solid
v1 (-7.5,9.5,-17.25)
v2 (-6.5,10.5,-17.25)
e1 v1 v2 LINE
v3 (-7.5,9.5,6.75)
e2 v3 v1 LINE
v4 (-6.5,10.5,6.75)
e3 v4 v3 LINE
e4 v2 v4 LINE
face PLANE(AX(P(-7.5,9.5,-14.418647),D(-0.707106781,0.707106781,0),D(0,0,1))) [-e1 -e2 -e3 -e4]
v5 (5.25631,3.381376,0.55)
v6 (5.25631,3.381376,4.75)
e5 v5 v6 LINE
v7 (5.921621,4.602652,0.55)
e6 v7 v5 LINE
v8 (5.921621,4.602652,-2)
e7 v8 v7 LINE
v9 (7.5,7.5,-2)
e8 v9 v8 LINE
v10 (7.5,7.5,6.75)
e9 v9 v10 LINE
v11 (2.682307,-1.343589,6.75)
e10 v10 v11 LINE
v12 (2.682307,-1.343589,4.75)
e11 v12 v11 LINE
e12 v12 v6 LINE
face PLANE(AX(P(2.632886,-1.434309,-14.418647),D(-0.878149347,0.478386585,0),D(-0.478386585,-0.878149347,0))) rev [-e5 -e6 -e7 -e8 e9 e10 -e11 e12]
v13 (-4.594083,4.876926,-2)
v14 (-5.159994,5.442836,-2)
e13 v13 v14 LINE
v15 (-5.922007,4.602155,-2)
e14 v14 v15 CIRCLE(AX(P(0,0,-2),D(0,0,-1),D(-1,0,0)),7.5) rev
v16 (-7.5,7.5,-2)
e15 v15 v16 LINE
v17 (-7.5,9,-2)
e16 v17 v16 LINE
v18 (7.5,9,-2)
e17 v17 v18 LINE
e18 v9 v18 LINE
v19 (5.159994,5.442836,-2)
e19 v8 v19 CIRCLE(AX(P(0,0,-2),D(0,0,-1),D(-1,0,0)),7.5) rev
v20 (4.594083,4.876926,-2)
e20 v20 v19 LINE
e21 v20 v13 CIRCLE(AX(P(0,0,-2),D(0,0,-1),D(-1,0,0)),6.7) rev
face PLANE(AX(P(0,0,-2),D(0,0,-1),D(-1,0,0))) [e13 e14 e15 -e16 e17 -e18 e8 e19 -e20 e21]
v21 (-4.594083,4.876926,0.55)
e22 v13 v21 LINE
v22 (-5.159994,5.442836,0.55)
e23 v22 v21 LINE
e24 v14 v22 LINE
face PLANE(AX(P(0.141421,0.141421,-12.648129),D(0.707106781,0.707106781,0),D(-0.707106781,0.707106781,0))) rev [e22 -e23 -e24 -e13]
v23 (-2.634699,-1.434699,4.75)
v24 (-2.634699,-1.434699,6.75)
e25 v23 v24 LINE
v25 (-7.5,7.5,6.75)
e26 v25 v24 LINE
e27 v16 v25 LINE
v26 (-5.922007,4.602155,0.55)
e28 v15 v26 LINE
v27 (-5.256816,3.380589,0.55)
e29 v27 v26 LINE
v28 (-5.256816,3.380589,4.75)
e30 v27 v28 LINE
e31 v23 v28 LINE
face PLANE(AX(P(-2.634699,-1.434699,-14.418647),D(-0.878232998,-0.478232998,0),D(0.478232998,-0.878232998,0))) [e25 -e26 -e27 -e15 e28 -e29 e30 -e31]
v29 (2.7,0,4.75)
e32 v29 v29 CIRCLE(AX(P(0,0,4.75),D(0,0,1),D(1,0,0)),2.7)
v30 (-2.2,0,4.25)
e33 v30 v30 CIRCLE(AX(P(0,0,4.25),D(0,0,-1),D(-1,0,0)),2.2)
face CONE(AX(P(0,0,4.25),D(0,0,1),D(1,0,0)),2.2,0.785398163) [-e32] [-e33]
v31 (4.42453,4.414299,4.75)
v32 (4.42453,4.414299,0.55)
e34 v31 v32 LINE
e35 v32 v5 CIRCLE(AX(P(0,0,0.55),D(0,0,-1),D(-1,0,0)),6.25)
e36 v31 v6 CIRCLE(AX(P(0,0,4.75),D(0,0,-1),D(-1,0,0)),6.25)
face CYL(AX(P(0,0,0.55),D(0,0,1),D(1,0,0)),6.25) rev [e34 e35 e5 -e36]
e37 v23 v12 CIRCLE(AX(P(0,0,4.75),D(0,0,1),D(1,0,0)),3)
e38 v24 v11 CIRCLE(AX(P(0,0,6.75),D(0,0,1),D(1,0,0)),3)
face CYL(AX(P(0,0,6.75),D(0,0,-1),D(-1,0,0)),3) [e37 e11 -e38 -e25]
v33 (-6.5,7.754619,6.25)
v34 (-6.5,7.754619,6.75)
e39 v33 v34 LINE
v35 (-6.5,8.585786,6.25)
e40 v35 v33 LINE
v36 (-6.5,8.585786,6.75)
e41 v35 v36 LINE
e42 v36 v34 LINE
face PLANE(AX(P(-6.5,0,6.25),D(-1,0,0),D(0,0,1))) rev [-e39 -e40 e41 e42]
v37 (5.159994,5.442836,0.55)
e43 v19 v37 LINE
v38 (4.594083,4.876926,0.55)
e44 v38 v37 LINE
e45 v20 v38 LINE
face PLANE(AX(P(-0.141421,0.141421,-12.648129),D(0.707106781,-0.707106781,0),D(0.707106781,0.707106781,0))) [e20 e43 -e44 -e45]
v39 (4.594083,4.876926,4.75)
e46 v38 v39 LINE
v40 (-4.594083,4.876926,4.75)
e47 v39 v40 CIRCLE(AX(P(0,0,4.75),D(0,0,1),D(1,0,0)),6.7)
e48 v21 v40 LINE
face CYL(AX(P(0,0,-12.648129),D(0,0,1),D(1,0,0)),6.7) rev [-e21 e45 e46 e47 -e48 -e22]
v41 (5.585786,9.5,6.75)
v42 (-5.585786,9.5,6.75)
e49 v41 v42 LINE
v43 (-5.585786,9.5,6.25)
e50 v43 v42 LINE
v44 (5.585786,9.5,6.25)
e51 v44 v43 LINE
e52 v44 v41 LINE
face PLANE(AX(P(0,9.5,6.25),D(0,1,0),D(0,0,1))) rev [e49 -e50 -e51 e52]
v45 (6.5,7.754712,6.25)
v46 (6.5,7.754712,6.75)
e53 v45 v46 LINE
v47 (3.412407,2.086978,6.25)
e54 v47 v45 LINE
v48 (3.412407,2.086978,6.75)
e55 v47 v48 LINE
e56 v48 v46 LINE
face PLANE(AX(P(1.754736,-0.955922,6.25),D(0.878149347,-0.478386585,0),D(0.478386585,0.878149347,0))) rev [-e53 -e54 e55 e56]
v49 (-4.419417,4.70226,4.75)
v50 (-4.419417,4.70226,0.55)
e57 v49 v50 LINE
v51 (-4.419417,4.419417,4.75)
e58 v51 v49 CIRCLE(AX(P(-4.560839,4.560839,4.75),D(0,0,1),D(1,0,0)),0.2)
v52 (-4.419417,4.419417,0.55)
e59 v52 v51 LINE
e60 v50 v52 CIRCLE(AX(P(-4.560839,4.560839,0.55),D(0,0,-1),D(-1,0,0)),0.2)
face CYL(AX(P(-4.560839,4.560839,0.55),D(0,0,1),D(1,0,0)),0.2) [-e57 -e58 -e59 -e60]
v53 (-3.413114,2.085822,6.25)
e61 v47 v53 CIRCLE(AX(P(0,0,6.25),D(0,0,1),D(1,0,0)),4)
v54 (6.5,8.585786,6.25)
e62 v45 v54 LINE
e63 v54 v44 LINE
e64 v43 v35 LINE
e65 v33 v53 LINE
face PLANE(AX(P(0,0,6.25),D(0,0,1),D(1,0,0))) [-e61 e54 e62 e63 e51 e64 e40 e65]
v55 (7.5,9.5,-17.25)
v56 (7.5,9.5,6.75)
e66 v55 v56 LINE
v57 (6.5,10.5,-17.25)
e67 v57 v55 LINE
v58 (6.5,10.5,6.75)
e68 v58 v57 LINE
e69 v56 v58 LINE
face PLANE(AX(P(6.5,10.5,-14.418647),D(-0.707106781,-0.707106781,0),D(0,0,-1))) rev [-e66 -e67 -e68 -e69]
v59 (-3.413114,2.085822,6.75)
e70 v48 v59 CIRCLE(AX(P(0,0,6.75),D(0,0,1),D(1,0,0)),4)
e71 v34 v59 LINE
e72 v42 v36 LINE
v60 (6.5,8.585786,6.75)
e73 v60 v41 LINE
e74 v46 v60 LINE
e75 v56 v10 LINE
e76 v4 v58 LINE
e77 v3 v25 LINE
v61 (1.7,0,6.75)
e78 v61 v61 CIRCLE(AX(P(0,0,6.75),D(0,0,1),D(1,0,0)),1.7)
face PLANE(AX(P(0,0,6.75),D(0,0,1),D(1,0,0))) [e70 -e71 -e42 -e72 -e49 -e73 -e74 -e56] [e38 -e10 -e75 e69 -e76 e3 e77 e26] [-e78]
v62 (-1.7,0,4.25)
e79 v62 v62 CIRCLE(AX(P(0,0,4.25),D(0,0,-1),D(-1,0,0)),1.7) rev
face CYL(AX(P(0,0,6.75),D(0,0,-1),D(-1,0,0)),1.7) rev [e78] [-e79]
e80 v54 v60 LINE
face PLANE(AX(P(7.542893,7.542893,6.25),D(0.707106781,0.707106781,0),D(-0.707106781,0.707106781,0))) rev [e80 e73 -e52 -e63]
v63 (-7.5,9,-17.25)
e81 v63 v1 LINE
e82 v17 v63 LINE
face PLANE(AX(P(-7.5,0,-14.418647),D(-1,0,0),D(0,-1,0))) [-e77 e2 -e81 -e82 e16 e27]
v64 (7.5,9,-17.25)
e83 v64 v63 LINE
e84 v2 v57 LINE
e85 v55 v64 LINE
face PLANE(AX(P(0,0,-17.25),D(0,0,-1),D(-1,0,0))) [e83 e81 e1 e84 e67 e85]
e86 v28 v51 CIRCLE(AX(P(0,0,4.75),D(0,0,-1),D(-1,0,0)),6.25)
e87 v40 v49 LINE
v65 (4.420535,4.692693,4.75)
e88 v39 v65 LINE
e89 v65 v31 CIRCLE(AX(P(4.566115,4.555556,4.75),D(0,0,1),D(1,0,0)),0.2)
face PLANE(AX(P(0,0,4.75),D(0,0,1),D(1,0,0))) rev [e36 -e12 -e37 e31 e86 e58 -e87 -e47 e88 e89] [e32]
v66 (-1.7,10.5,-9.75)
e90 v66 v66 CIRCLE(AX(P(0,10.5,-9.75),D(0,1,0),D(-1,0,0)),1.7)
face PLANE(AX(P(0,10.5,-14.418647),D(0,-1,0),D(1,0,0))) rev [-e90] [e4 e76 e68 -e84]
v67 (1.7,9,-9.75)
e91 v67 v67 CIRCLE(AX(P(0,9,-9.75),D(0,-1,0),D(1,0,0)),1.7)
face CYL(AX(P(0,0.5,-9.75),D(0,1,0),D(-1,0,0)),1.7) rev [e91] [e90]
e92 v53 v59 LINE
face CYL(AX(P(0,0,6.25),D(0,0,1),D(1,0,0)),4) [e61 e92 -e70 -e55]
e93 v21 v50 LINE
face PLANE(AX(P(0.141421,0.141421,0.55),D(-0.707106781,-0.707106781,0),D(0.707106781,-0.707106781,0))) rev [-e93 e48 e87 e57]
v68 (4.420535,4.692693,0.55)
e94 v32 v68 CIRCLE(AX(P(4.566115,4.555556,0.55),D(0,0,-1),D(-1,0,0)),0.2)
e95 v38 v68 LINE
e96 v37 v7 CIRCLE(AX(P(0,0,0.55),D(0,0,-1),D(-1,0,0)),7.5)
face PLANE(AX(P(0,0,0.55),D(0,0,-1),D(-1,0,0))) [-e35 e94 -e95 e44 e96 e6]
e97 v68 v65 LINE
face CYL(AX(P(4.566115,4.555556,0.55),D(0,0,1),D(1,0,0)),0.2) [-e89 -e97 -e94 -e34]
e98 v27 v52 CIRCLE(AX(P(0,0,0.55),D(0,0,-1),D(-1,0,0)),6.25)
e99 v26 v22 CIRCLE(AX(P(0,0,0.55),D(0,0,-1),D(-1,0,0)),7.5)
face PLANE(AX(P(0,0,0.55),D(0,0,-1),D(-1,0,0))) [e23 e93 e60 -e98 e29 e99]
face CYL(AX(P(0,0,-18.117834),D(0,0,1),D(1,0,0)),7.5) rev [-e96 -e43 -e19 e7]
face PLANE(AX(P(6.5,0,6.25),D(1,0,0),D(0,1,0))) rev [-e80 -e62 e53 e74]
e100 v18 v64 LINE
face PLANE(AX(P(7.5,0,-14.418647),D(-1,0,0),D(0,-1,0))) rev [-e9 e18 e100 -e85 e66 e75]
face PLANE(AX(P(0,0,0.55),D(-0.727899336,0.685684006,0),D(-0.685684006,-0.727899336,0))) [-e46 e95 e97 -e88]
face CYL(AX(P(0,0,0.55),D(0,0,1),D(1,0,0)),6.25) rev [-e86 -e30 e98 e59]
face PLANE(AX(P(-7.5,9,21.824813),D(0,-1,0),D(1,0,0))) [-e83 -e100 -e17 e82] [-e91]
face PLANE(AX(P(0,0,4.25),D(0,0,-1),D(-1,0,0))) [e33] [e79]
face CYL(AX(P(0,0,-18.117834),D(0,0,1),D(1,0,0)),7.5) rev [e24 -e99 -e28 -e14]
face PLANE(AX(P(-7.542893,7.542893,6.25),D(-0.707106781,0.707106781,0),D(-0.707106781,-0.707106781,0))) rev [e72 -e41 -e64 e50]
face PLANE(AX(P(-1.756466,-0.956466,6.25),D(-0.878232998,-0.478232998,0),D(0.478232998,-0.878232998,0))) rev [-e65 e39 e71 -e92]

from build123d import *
from build123d.topology import SkipClean

# Parameters (mm, degrees)
BOSS_EXTRUDE1_DEPTH  = 2
BOSS_EXTRUDE2_START  = 4.75
BOSS_EXTRUDE2_DEPTH  = 4.75
BOSS_EXTRUDE3_START  = 2
SKETCH3_R            = 3
SKETCH3_R_2          = 1.7
BOSS_EXTRUDE3_DEPTH  = 2
SKETCH4_R            = 2.2
SKETCH4_R_2          = 1.7
BOSS_EXTRUDE4_DEPTH  = 0.5
CHAMFER1_SIZE        = 0.5
SKETCH5_W            = 7.5
SKETCH5_H            = 3
BOSS_EXTRUDE5_DEPTH  = 2
BOSS_EXTRUDE6_DEPTH  = 4.2
BOSS_EXTRUDE8_DEPTH  = 6.75
SKETCH10_W           = 15
SKETCH10_H           = 3
BOSS_EXTRUDE9_DEPTH  = 15.25
SKETCH11_R           = 1.65
CUT_EXTRUDE1_DEPTH   = 22.542109925
FILLET1_R            = 0.2
CHAMFER6_SIZE        = 1.5
BOSS_EXTRUDE12_REACH = 29.249
SKETCH16_W           = 15
SKETCH16_H           = 1.5
CUT_EXTRUDE3_DEPTH   = 0.5
CHAMFER7_SIZE        = 1
CUT_EXTRUDE4_DEPTH   = 15.25
SKETCH18_R           = 1.7
CUT_EXTRUDE5_DEPTH   = 10


with BuildPart() as part:
    # Sketch1 → Boss-Extrude1 (new body)
    with BuildSketch(Plane.XY):
        with BuildLine():
            Line((4.594082841, 4.876925553), (5.159993549, 5.442836262))
            ThreePointArc((5.159993549, 5.442836262), (0, 7.5), (-5.159993549, 5.442836262))
            Line((-5.159993549, 5.442836262), (-4.594082841, 4.876925553))
            ThreePointArc((-4.594082841, 4.876925553), (0, 6.7), (4.594082841, 4.876925553))
        make_face()
    extrude(amount=-BOSS_EXTRUDE1_DEPTH)

    # Sketch1<3> → Boss-Extrude2 (add)
    with BuildSketch(Plane.XY.offset(BOSS_EXTRUDE2_START)):
        with BuildLine():
            Line((4.594082841, 4.876925553), (5.159993549, 5.442836262))
            ThreePointArc((5.159993549, 5.442836262), (0, 7.5), (-5.159993549, 5.442836262))
            Line((-5.159993549, 5.442836262), (-4.594082841, 4.876925553))
            ThreePointArc((-4.594082841, 4.876925553), (0, 6.7), (4.594082841, 4.876925553))
        make_face()
    extrude(amount=-BOSS_EXTRUDE2_DEPTH)

    # Sketch3 → Boss-Extrude3 (add)
    # profile 1 of 4: a face of its own
    with BuildSketch(Plane.XY.offset(4.75).offset(BOSS_EXTRUDE3_START)):
        with BuildLine():
            Line((-4.594082841, 4.876925553), (-5.159993549, 5.442836262))
            Line((-5.159993549, 5.442836262), (-2.820975701, -1.02083108))
            ThreePointArc((-2.820975701, -1.02083108), (-2.892694114, 0.795185994), (-1.902774006, 2.31936437))
            Line((-1.902774006, 2.31936437), (-2.780654635, 4.745309242))
            ThreePointArc((-2.780654635, 4.745309242), (0, 5.5), (2.780654635, 4.745309242))
            Line((2.780654635, 4.745309242), (1.902774006, 2.31936437))
            ThreePointArc((1.902774006, 2.31936437), (2.711855639, 1.282902565), (3, 0))
            ThreePointArc((3, 0), (2.954904999, -0.518205025), (2.820975701, -1.02083108))
            Line((2.820975701, -1.02083108), (5.159993549, 5.442836262))
            Line((5.159993549, 5.442836262), (4.594082841, 4.876925553))
            ThreePointArc((4.594082841, 4.876925553), (0, 6.7), (-4.594082841, 4.876925553))
        make_face()
    # profile 2 of 4: a face of its own
    with BuildSketch(Plane.XY.offset(4.75).offset(BOSS_EXTRUDE3_START)):
        with BuildLine():
            Line((-5.159993549, 5.442836262), (-4.594082841, 4.876925553))
            ThreePointArc((-4.594082841, 4.876925553), (0, 6.7), (4.594082841, 4.876925553))
            Line((4.594082841, 4.876925553), (5.159993549, 5.442836262))
            ThreePointArc((5.159993549, 5.442836262), (0, 7.5), (-5.159993549, 5.442836262))
        make_face()
    # profile 3 of 4: a face of its own
    with BuildSketch(Plane.XY.offset(4.75).offset(BOSS_EXTRUDE3_START)):
        Circle(SKETCH3_R)
        Circle(SKETCH3_R_2, mode=Mode.SUBTRACT)
    # profile 4 of 4: a face of its own
    with BuildSketch(Plane.XY.offset(4.75).offset(BOSS_EXTRUDE3_START)):
        with BuildLine():
            Line((-2.780654635, 4.745309242), (-1.902774006, 2.31936437))
            ThreePointArc((-1.902774006, 2.31936437), (0, 3), (1.902774006, 2.31936437))
            Line((1.902774006, 2.31936437), (2.780654635, 4.745309242))
            ThreePointArc((2.780654635, 4.745309242), (0, 5.5), (-2.780654635, 4.745309242))
        make_face()
    extrude(amount=-BOSS_EXTRUDE3_DEPTH)

    # Sketch4 → Boss-Extrude4 (add)
    with SkipClean():  # the faces are left unmerged after this step: merging them gives an invalid solid
        with BuildSketch(Plane(origin=(0, 0, 4.75), x_dir=(-1, 0, 0), z_dir=(0, 0, -1))):
            with Locations(Location((0, 0, 0), (0, 0, 180))):
                Circle(SKETCH4_R)
            Circle(SKETCH4_R_2, mode=Mode.SUBTRACT)
        extrude(amount=BOSS_EXTRUDE4_DEPTH)
    add(part.part.scale(1), mode=Mode.REPLACE)  # the faces are merged on a copy

    # Chamfer1
    chamfer1_edges = [part.edges().sort_by_distance(p)[0] for p in [
        (-2.2, 0, 4.75),
    ]]
    chamfer(chamfer1_edges, length=CHAMFER1_SIZE - 0.0001)  # a hair under: the kernel refuses the full size

    # Sketch5 → Boss-Extrude5 (add)
    with BuildSketch(Plane.XY.offset(6.75)):
        with BuildLine():
            ThreePointArc((-5.159993549, 5.442836262), (-2.777474396, 6.966752183), (0, 7.5))
            Line((0, 7.5), (-7.5, 7.5))
            Line((-7.5, 7.5), (-2.634698995, -1.434698995))
            ThreePointArc((-2.634698995, -1.434698995), (-2.735675101, -1.231292711), (-2.820975701, -1.02083108))
            Line((-2.820975701, -1.02083108), (-5.159993549, 5.442836262))
        make_face()
        with Locations((-3.75, 9)):
            Rectangle(SKETCH5_W, SKETCH5_H)
        with Locations((3.75, 9)):
            Rectangle(SKETCH5_W, SKETCH5_H)
        with BuildLine():
            Line((7.5, 7.5), (0, 7.5))
            ThreePointArc((0, 7.5), (2.777474396, 6.966752183), (5.159993549, 5.442836262))
            Line((5.159993549, 5.442836262), (2.820975701, -1.02083108))
            ThreePointArc((2.820975701, -1.02083108), (2.756369418, -1.184241374), (2.682306676, -1.343588812))
            Line((2.682306676, -1.343588812), (7.5, 7.5))
        make_face()
    extrude(amount=-BOSS_EXTRUDE5_DEPTH)

    # Sketch6 → Boss-Extrude6 (add)
    with SkipClean():  # the faces are left unmerged after this step: merging them gives an invalid solid
        with BuildSketch(Plane(origin=(0, 0, 4.75), x_dir=(-1, 0, 0), z_dir=(0, 0, -1))):
            with BuildLine():
                Line((-5.921621025, 4.602651891), (-5.499242594, 3.827313795))
                ThreePointArc((-5.499242594, 3.827313795), (-5.073876801, 4.375588441), (-4.594082841, 4.876925553))
                Line((-4.594082841, 4.876925553), (-5.159993549, 5.442836262))
                ThreePointArc((-5.159993549, 5.442836262), (-5.556709713, 5.037159632), (-5.921621025, 4.602651891))
            make_face()
            with BuildLine():
                Line((5.159993549, 5.442836262), (4.594082841, 4.876925553))
                ThreePointArc((4.594082841, 4.876925553), (5.074143899, 4.375278699), (5.499709828, 3.826642367))
                Line((5.499709828, 3.826642367), (5.922007367, 4.602154794))
                ThreePointArc((5.922007367, 4.602154794), (5.556921127, 5.036926403), (5.159993549, 5.442836262))
            make_face()
            with BuildLine():
                Line((-5.499242594, 3.827313795), (-5.256310338, 3.381375701))
                ThreePointArc((-5.256310338, 3.381375701), (-4.806527723, 3.994970744), (-4.285525038, 4.549370852))
                Line((-4.285525038, 4.549370852), (-4.594082841, 4.876925553))
                ThreePointArc((-4.594082841, 4.876925553), (-5.073876801, 4.375588441), (-5.499242594, 3.827313795))
            make_face()
            with BuildLine():
                Line((4.594082841, 4.876925553), (4.275732705, 4.558575417))
                ThreePointArc((4.275732705, 4.558575417), (4.802528974, 3.999776925), (5.256816116, 3.380589346))
                Line((5.256816116, 3.380589346), (5.499709828, 3.826642367))
                ThreePointArc((5.499709828, 3.826642367), (5.074143899, 4.375278699), (4.594082841, 4.876925553))
            make_face()
        extrude(amount=BOSS_EXTRUDE6_DEPTH)

    # Sketch8 → Boss-Extrude8 (add)
    with BuildSketch(Plane(origin=(0, 0, 4.75), x_dir=(-1, 0, 0), z_dir=(0, 0, -1))):
        with BuildLine():
            Line((5.922007367, 4.602154794), (7.5, 7.5))
            Line((7.5, 7.5), (7.5, 10.5))
            Line((7.5, 10.5), (-7.5, 10.5))
            Line((-7.5, 10.5), (-7.5, 7.5))
            Line((-7.5, 7.5), (-5.921621025, 4.602651891))
            ThreePointArc((-5.921621025, 4.602651891), (0.000314788, 7.499999993), (5.922007367, 4.602154794))
        make_face()
    extrude(amount=BOSS_EXTRUDE8_DEPTH)

    # Sketch10 → Boss-Extrude9 (add)
    with BuildSketch(Plane(origin=(0, 0, -2), x_dir=(-1, 0, 0), z_dir=(0, 0, -1))):
        with Locations((0, 9)):
            Rectangle(SKETCH10_W, SKETCH10_H)
    extrude(amount=BOSS_EXTRUDE9_DEPTH)

    # Sketch11 → Cut-Extrude1 (cut, through all)
    with BuildSketch(Plane.XZ.offset(-7.5)):
        with Locations(Location((0, -9.5, 0), (0, 0, 270))):
            Circle(SKETCH11_R)
    extrude(amount=-CUT_EXTRUDE1_DEPTH, mode=Mode.SUBTRACT)

    # Fillet1
    fillet1_edges = [part.edges().sort_by_distance(p)[0] for p in [
        (4.285525038, 4.549370852, 2.65),
        (-4.275732705, 4.558575417, 2.65),
    ]]
    fillet(fillet1_edges, radius=FILLET1_R)

    # Chamfer6
    chamfer6_edges = [part.edges().sort_by_distance(p)[0] for p in [
        (7.5, 10.5, -5.25),
        (-7.5, 10.5, -5.25),
    ]]
    chamfer(chamfer6_edges, length=CHAMFER6_SIZE)

    # Boss-Extrude12: up to this face of the body (flat: up to its plane)
    boss_extrude12_end = Plane(part.part.faces().sort_by_distance((-0.00029363, 5.45528482, 6.75))[0])
    # Sketch16 → Boss-Extrude12 (add, up to the picked face)
    with BuildSketch(Plane(origin=(0, 0, -17.25), x_dir=(-1, 0, 0), z_dir=(0, 0, -1)), mode=Mode.PRIVATE) as boss_extrude12_sk1:
        with Locations((0, 9.75)):
            Rectangle(SKETCH16_W, SKETCH16_H)
    boss_extrude12_tool1 = split(extrude(boss_extrude12_sk1.sketch, amount=-BOSS_EXTRUDE12_REACH, mode=Mode.PRIVATE), bisect_by=boss_extrude12_end, keep=Keep.BOTH, mode=Mode.PRIVATE)
    add(boss_extrude12_tool1.solids().sort_by(Axis((0, 9.75, -17.25), (0, 0, 1)))[0])

    # Sketch13 → Cut-Extrude3 (cut)
    with BuildSketch(Plane.XY.offset(6.75)):
        with BuildLine():
            ThreePointArc((3.4124071, 2.086978147), (-0.000677338, 3.999999943), (-3.413113698, 2.085822351))
            Line((-3.413113698, 2.085822351), (-6.5, 7.754618569))
            Line((-6.5, 7.754618569), (-6.5, 8.585786438))
            Line((-6.5, 8.585786438), (-5.585786438, 9.5))
            Line((-5.585786438, 9.5), (5.585786438, 9.5))
            Line((5.585786438, 9.5), (6.5, 8.585786438))
            Line((6.5, 8.585786438), (6.5, 7.754711685))
            Line((6.5, 7.754711685), (3.4124071, 2.086978147))
        make_face()
    extrude(amount=-CUT_EXTRUDE3_DEPTH, mode=Mode.SUBTRACT)

    # Chamfer7
    chamfer7_edges = [part.edges().sort_by_distance(p)[0] for p in [
        (7.5, 10.5, -5.25),
        (-7.5, 10.5, -5.25),
    ]]
    chamfer(chamfer7_edges, length=CHAMFER7_SIZE)

    # Sketch17 → Cut-Extrude4 (cut)
    with BuildSketch(Plane(origin=(0, 0, -17.25), x_dir=(-1, 0, 0), z_dir=(0, 0, -1))):
        Polygon((7.5, 9), (-6.884093455, 9), (-7.5, 9), (-7.5, 7.5), (7.5, 7.5), align=None)
    extrude(amount=-CUT_EXTRUDE4_DEPTH, mode=Mode.SUBTRACT)

    # Sketch18 → Cut-Extrude5 (cut)
    with BuildSketch(Plane(origin=(0, 10.5, 0), x_dir=(1, 0, 0), z_dir=(0, 1, 0))):
        with Locations(Location((0, 9.75, 0), (0, 0, 180))):
            Circle(SKETCH18_R)
    extrude(amount=-CUT_EXTRUDE5_DEPTH, mode=Mode.SUBTRACT)


solid = part.part
